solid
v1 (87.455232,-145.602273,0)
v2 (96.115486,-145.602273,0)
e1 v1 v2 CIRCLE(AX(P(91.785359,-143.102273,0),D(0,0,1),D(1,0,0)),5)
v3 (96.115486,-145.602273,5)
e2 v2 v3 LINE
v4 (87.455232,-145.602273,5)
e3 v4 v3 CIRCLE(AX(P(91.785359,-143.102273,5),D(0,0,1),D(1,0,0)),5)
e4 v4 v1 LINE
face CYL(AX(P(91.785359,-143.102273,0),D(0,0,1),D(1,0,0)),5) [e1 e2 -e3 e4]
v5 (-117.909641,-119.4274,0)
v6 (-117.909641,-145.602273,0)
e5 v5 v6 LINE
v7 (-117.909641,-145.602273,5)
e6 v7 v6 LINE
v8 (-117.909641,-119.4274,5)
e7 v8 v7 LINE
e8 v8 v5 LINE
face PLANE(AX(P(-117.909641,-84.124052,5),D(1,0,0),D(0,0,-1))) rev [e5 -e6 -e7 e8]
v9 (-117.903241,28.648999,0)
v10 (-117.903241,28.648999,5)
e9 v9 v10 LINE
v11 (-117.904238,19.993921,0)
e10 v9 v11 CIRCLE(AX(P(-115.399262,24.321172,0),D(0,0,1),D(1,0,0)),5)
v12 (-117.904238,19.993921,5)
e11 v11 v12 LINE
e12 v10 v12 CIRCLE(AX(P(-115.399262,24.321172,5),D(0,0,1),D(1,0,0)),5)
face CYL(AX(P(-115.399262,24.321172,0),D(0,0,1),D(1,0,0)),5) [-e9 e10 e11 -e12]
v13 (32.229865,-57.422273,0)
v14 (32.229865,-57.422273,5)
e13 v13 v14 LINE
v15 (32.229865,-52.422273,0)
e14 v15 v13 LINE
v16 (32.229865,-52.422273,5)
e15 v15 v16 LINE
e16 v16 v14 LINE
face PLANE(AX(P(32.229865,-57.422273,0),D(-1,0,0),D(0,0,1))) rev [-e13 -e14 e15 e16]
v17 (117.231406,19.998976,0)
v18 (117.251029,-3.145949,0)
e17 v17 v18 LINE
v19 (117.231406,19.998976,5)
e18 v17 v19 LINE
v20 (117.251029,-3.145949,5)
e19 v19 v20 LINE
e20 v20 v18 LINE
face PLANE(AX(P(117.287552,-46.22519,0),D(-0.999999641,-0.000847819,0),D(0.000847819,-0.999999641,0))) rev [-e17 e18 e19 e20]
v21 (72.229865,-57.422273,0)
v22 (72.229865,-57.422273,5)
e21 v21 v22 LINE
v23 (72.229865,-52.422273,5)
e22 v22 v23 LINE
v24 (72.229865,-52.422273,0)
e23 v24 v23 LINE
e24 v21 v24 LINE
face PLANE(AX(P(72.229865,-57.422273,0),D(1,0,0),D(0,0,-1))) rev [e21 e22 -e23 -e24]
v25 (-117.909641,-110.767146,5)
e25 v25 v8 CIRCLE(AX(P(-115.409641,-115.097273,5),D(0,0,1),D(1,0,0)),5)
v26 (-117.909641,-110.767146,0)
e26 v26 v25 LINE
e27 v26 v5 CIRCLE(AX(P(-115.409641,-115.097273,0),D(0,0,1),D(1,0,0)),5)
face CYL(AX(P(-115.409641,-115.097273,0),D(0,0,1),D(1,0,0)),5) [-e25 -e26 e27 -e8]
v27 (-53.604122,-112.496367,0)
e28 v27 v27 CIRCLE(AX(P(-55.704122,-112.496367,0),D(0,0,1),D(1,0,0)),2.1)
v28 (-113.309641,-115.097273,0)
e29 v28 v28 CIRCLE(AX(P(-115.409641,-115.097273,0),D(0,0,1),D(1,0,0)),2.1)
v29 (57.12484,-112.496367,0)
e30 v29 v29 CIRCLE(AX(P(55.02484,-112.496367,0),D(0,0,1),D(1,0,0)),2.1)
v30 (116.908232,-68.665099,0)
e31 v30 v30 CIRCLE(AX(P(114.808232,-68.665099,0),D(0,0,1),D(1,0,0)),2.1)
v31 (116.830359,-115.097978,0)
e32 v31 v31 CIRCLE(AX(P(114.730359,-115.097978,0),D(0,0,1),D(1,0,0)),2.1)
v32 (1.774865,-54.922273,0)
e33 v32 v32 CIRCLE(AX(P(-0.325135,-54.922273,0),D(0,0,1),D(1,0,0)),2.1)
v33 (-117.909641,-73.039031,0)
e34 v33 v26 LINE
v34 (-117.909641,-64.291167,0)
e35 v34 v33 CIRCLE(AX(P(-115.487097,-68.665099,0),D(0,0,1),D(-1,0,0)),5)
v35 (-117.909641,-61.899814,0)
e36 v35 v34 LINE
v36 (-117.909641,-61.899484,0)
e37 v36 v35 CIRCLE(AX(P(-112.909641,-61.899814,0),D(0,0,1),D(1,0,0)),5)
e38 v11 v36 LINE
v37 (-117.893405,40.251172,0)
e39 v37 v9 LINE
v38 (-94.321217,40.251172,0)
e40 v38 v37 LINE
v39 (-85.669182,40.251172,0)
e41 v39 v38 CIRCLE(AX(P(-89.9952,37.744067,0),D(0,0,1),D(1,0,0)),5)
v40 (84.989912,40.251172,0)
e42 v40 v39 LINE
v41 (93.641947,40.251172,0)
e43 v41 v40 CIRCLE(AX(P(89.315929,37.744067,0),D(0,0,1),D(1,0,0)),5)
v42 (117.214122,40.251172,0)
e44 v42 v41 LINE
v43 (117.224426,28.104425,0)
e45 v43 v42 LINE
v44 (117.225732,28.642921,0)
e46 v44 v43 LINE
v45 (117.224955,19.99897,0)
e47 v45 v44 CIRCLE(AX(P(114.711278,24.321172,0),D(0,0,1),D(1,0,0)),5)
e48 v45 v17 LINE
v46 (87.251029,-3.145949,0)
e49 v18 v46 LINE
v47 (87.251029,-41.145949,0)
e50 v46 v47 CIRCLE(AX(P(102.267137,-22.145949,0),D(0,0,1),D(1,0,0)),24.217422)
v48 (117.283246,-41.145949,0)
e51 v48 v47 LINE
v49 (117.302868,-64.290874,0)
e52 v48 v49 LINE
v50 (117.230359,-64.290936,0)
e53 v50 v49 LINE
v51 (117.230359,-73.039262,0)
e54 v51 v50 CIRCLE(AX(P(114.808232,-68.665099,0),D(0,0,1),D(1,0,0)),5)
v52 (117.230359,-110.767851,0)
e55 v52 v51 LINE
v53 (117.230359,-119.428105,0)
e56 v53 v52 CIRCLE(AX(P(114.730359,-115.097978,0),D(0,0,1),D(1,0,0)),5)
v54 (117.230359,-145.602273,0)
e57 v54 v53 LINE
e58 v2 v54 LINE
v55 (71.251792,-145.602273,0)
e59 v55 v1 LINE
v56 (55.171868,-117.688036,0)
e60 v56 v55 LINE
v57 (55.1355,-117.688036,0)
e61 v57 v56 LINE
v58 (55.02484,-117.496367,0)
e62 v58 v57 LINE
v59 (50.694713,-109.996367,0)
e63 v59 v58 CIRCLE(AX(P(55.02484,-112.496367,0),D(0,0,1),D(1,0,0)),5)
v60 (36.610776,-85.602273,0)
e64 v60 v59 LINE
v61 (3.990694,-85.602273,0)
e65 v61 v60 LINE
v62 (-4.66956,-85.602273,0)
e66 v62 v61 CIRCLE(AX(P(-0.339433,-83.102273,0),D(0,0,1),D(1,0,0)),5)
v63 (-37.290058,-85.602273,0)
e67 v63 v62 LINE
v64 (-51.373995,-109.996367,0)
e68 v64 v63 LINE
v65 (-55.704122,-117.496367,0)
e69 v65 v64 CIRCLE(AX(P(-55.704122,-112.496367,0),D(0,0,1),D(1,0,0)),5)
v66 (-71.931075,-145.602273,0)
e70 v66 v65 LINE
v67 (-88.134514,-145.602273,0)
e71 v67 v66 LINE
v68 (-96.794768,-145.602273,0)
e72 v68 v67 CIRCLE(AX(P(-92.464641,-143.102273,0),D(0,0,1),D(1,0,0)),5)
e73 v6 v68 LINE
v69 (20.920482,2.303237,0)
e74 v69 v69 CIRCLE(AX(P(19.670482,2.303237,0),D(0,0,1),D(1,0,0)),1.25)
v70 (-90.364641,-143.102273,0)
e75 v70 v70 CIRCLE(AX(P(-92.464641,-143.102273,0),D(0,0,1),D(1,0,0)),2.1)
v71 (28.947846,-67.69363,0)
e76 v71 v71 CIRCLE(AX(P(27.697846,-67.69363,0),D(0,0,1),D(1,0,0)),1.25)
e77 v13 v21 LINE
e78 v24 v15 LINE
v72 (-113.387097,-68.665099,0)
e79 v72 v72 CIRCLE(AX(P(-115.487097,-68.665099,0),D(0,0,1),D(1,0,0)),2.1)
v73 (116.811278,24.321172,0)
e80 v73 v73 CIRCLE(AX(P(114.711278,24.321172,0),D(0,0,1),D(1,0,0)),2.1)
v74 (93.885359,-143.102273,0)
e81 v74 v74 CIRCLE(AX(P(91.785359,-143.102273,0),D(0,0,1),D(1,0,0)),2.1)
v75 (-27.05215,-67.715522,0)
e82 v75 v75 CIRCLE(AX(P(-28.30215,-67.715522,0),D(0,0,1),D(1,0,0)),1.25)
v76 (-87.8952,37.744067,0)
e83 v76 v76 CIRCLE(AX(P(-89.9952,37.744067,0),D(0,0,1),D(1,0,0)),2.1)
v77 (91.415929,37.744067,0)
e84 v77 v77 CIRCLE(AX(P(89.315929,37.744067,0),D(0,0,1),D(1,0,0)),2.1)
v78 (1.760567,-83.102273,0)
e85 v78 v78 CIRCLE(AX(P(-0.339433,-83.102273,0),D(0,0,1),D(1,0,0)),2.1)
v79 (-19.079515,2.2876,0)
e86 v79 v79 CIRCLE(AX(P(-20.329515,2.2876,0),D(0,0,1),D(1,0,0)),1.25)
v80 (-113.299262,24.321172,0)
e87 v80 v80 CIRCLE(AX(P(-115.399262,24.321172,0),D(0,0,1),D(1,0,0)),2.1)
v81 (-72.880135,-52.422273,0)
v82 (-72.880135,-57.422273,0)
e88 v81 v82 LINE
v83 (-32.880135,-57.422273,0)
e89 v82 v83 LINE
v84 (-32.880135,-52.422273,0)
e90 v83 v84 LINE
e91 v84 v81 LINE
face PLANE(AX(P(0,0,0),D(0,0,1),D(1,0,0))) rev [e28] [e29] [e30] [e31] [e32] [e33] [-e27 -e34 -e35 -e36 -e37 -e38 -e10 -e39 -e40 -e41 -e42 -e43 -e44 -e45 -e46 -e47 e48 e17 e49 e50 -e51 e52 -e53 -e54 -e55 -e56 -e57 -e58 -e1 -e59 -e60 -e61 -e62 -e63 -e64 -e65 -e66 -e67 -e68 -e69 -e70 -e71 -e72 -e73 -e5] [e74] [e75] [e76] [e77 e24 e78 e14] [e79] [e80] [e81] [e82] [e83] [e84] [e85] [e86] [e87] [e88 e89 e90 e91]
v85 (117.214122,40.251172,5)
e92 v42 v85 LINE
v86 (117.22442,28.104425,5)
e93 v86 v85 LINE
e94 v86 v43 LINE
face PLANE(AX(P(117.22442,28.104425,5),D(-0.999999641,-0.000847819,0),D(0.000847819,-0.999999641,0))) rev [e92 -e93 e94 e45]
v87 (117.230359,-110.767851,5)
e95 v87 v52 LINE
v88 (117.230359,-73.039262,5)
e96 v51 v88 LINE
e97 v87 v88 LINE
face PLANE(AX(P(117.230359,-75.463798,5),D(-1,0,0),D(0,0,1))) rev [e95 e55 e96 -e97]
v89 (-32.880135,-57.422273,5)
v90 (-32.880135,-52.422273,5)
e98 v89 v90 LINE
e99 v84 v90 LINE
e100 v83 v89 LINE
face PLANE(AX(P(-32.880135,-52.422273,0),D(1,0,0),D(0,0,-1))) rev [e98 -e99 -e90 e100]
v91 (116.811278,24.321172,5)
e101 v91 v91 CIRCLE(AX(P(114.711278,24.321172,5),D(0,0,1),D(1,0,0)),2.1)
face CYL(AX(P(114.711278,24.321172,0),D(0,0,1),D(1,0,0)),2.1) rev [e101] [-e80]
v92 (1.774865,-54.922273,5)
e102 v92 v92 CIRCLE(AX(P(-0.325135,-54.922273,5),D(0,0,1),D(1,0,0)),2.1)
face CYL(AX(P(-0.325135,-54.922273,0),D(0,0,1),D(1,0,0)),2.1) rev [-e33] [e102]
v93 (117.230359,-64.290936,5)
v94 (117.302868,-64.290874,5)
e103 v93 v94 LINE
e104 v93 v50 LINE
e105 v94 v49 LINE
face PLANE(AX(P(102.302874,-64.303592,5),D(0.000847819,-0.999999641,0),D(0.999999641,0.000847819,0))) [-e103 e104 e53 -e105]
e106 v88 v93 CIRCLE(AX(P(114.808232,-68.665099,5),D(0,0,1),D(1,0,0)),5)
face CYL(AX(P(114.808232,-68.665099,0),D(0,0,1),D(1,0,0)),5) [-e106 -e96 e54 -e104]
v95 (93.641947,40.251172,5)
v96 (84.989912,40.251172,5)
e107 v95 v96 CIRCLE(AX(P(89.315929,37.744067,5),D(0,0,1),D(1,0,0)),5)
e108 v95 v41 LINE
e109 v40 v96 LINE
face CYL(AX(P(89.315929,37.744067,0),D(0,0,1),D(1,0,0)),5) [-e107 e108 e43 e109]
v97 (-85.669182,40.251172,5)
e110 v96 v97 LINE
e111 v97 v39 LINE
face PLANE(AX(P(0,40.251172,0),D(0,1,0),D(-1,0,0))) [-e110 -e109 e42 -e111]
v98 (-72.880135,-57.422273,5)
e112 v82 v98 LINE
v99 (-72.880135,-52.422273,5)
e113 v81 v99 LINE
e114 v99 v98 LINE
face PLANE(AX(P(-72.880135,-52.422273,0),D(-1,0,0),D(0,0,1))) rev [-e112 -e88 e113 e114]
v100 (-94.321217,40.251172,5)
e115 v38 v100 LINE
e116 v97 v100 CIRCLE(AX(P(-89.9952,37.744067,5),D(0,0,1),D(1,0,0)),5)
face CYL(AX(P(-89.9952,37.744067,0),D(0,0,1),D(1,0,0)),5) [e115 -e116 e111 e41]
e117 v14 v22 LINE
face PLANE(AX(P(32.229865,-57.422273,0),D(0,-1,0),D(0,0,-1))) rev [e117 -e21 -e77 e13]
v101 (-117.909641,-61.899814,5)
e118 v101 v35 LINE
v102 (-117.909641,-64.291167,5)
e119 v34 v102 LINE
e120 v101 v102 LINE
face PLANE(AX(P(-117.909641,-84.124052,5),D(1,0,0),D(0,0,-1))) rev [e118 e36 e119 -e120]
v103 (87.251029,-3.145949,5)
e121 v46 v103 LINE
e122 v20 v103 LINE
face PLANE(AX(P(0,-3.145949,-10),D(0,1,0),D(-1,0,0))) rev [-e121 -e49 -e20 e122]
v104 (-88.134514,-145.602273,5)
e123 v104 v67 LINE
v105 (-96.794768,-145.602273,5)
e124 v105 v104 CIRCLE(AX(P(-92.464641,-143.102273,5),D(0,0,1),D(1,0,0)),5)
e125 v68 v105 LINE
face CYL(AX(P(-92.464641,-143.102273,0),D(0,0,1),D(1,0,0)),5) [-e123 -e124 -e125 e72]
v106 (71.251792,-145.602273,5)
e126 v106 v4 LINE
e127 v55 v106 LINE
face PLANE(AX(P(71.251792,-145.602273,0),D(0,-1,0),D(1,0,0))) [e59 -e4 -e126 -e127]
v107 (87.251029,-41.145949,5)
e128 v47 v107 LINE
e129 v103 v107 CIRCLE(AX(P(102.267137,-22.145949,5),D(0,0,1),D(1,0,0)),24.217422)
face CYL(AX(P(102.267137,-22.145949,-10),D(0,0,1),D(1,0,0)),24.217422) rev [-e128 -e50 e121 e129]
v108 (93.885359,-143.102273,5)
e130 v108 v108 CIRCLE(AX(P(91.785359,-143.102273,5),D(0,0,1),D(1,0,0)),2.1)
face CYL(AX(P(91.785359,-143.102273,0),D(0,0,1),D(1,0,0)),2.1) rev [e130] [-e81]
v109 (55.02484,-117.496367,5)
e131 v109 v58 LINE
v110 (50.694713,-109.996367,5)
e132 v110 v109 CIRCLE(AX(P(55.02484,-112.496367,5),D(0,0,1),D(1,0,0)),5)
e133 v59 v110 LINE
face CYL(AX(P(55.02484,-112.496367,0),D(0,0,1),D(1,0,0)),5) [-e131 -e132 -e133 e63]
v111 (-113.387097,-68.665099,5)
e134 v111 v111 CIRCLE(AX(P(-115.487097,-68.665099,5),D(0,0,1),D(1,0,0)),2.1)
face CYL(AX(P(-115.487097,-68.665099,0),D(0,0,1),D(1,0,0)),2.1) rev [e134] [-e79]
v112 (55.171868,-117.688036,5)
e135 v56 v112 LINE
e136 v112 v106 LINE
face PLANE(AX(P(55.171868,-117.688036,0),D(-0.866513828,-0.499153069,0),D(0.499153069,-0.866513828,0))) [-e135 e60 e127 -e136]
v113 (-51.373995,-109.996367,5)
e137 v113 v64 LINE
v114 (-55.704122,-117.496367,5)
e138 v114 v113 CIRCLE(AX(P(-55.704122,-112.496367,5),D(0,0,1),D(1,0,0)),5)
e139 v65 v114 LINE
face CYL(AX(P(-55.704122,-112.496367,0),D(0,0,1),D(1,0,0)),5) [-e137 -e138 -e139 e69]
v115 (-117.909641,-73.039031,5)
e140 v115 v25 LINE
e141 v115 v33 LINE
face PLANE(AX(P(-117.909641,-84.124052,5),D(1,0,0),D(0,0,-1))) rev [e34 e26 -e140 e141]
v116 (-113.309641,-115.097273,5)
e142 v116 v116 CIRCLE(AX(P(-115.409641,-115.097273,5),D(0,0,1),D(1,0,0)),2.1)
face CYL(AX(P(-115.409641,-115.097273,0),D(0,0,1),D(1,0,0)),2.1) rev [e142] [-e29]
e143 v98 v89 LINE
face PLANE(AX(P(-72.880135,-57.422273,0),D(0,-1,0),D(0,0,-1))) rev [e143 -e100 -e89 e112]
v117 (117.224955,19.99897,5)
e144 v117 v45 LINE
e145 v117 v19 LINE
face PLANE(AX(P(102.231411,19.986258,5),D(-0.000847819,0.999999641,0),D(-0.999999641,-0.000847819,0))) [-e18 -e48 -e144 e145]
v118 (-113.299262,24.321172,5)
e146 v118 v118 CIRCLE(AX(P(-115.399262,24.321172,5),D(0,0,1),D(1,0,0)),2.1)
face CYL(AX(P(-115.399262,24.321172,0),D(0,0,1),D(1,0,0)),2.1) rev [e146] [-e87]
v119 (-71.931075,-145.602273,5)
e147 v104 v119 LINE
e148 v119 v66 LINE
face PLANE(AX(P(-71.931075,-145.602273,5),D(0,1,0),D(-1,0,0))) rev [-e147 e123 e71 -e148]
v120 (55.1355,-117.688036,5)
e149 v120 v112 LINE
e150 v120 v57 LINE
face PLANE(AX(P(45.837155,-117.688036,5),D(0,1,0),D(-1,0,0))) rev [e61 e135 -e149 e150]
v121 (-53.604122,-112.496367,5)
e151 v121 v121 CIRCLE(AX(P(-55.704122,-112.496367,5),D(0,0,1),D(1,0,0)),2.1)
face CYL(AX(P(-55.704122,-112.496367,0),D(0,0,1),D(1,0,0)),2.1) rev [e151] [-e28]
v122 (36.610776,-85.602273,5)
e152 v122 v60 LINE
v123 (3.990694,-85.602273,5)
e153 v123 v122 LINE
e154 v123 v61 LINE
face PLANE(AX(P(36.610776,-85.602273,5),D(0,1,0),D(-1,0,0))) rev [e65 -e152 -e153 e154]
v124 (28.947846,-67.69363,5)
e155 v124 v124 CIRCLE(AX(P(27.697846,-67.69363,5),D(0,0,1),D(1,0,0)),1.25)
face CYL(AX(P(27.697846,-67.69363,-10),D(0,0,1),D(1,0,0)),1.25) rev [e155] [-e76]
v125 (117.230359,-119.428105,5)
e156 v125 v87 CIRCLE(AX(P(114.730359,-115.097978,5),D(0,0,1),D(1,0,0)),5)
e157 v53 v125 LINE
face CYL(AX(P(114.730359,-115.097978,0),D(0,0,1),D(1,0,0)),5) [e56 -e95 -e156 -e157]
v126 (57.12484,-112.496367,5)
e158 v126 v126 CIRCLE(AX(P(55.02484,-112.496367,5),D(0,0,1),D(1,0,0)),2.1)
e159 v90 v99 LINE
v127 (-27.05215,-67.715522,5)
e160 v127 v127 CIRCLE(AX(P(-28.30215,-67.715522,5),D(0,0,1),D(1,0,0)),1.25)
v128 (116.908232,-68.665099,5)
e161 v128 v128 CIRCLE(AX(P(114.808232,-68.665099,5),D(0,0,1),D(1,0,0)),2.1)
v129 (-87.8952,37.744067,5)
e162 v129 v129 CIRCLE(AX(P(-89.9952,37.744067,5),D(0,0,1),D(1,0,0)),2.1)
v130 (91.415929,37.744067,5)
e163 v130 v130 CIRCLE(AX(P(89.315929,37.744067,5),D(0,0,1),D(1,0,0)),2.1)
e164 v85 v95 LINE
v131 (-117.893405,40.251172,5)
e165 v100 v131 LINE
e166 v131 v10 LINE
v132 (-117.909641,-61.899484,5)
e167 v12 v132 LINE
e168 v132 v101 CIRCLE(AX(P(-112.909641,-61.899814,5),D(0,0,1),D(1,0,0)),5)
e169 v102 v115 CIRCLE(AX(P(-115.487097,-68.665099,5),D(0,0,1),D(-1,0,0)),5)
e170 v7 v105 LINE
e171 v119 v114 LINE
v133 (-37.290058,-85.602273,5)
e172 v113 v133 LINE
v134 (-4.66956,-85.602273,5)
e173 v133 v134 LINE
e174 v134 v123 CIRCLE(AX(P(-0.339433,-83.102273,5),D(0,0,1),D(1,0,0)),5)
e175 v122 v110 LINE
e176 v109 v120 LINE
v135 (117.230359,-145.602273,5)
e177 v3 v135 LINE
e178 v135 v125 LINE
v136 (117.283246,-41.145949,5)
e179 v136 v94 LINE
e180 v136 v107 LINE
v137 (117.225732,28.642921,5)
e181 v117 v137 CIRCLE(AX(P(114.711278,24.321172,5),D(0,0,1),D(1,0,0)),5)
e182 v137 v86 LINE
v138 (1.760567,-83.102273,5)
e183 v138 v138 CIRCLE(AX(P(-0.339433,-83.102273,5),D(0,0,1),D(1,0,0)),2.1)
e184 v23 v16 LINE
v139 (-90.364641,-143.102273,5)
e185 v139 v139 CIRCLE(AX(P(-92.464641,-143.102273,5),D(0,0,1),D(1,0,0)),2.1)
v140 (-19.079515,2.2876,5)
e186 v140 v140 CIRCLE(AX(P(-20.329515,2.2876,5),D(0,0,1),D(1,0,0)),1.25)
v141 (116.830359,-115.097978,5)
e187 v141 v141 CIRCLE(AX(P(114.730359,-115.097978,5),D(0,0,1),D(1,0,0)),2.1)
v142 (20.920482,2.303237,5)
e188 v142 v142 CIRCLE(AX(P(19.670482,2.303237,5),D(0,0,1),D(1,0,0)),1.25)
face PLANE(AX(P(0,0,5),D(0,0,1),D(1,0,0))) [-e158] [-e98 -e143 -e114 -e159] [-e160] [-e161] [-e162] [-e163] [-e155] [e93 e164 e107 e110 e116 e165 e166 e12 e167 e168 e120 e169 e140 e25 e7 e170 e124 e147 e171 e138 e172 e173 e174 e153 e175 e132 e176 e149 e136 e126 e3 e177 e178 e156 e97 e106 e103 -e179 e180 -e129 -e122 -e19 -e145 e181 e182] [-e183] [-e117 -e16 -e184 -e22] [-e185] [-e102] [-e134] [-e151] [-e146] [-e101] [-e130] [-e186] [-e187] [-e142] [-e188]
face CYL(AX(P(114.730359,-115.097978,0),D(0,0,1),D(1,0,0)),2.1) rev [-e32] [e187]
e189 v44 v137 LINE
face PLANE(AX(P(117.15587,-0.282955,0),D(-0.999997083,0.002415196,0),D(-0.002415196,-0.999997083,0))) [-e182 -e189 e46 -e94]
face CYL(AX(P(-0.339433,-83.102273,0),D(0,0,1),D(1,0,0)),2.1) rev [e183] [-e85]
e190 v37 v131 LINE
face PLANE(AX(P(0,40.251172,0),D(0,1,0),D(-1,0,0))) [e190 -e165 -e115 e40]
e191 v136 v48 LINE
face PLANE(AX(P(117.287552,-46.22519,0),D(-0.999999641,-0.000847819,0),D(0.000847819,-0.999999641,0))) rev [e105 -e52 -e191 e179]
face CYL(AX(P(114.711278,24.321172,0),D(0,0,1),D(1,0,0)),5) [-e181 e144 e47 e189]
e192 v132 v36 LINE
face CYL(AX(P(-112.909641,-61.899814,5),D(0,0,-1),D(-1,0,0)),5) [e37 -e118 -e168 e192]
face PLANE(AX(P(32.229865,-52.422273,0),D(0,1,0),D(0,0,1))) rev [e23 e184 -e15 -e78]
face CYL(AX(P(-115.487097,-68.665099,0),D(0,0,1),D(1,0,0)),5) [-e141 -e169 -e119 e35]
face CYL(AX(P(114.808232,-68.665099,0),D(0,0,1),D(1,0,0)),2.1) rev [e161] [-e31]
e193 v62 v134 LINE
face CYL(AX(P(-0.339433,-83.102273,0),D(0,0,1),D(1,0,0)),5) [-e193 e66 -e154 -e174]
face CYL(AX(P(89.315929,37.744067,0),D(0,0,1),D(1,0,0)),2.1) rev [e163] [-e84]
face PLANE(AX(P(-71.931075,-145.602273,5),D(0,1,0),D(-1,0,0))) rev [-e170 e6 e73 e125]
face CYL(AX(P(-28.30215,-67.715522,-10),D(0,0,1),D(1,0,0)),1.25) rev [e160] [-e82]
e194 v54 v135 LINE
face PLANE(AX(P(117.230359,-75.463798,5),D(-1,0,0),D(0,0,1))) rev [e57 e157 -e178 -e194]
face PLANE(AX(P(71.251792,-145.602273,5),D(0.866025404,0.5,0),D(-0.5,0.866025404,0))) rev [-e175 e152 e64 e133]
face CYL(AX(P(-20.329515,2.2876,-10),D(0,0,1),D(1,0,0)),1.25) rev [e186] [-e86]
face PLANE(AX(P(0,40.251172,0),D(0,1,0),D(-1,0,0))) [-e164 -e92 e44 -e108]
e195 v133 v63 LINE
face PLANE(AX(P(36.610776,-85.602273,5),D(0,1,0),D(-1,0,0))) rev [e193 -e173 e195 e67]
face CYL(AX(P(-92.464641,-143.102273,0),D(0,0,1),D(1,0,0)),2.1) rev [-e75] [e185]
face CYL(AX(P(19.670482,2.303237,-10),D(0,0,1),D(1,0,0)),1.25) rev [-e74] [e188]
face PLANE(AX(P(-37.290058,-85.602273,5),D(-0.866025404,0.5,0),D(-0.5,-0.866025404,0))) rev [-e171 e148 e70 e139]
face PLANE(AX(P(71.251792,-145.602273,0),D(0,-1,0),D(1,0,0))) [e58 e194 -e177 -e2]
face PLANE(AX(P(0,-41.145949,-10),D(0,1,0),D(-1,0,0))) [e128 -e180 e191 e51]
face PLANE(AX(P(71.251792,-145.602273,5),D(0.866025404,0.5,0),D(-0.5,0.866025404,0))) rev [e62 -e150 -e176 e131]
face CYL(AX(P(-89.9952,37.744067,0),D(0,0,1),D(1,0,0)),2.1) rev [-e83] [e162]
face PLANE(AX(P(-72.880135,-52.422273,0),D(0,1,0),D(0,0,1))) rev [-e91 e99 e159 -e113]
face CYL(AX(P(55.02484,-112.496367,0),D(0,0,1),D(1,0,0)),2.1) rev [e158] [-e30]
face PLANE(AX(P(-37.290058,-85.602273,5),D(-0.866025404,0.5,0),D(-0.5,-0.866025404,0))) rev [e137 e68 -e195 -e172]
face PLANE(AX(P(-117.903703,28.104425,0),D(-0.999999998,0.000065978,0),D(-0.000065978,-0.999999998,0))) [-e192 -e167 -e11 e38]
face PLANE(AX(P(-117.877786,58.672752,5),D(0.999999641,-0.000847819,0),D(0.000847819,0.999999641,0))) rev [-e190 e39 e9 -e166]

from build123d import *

# Parameters (mm, degrees)
BOSS_EXTRUDE2_DEPTH  = 5
CUT_EXTRUDE1_START   = -5
CUT_EXTRUDE1_DEPTH   = 5
BOSS_EXTRUDE4_DEPTH  = 5
BOSS_EXTRUDE6_DEPTH  = 5
SKETCH7_R            = 2.1
CUT_EXTRUDE3_DEPTH   = 5
CUT_EXTRUDE7_START   = -5
CUT_EXTRUDE7_DEPTH   = 5
BOSS_EXTRUDE9_START  = -5
BOSS_EXTRUDE9_DEPTH  = 5
CUT_EXTRUDE10_DEPTH  = 5
SKETCH18_R           = 2.1
BOSS_EXTRUDE12_DEPTH = 5
BOSS_EXTRUDE13_DEPTH = 5
SKETCH21_W           = 5
SKETCH21_H           = 8.660255075
BOSS_EXTRUDE15_DEPTH = 0.3
CUT_EXTRUDE12_DEPTH  = 5
BOSS_EXTRUDE16_DEPTH = 5
BOSS_EXTRUDE17_DEPTH = 5
CUT_EXTRUDE13_DEPTH  = 5
SKETCH26_R           = 2.1
CUT_EXTRUDE14_DEPTH  = 5
CUT_EXTRUDE15_DEPTH  = 5
SKETCH28_R           = 2.1
BOSS_EXTRUDE18_DEPTH = 5
BOSS_EXTRUDE22_START = -5
BOSS_EXTRUDE22_DEPTH = 5
SKETCH31_R           = 2.1
CUT_EXTRUDE16_DEPTH  = 5
CUT_EXTRUDE17_DEPTH  = 5
SKETCH33_R           = 5
BOSS_EXTRUDE23_DEPTH = 5
SKETCH34_R           = 2.1
CUT_EXTRUDE18_DEPTH  = 5
SKETCH35_R           = 2.1
SKETCH35_W           = 40
SKETCH35_H           = 5
CUT_EXTRUDE19_DEPTH  = 5
SKETCH36_W           = 5
SKETCH36_H           = 84.289880446
BOSS_EXTRUDE24_DEPTH = 15
SKETCH38_R           = 1.25
CUT_EXTRUDE20_DEPTH  = 15
CUT_EXTRUDE22_DEPTH  = 15
SKETCH41_W           = 235.10328775
SKETCH41_H           = 5
CUT_EXTRUDE23_DEPTH  = 5
SKETCH42_W           = 21.47370592
SKETCH42_H           = 11.045026483
CUT_EXTRUDE24_DEPTH  = 5
BOSS_EXTRUDE25_DEPTH = 5
SKETCH44_R           = 2.1
CUT_EXTRUDE25_DEPTH  = 5


with BuildPart() as part:
    # Sketch1 → Boss-Extrude2 (new body)
    with BuildSketch(Plane.XY):
        with BuildLine():
            Line((-117.909641201, -61.899813743), (-117.909641201, -75.46379791))
            ThreePointArc((-117.909641201, -75.46379791), (-120.409641201, -79.793924929), (-117.909641201, -84.124051948))
            Line((-117.909641201, -84.124051948), (-117.909641201, -97.688036115))
            Line((-117.909641201, -97.688036115), (-104.194704325, -106.486172223))
            ThreePointArc((-104.194704325, -106.486172223), (-101.899920025, -110.928464988), (-96.905389489, -111.162269871))
            Line((-96.905389489, -111.162269871), (-86.732726665, -117.688036115))
            Line((-86.732726665, -117.688036115), (-46.516437834, -117.688036115))
            ThreePointArc((-46.516437834, -117.688036115), (-42.186310815, -120.188036115), (-37.856183796, -117.688036115))
            Line((-37.856183796, -117.688036115), (37.176901394, -117.688036115))
            ThreePointArc((37.176901394, -117.688036115), (41.507028413, -120.188036115), (45.837155432, -117.688036115))
            Line((45.837155432, -117.688036115), (86.053444263, -117.688036115))
            Line((86.053444263, -117.688036115), (96.226107086, -111.162269871))
            ThreePointArc((96.226107086, -111.162269871), (101.220637622, -110.928464988), (103.515421923, -106.486172223))
            Line((103.515421923, -106.486172223), (117.230358799, -97.688036115))
            Line((117.230358799, -97.688036115), (117.230358799, -84.124051948))
            ThreePointArc((117.230358799, -84.124051948), (119.730358799, -79.793924929), (117.230358799, -75.46379791))
            Line((117.230358799, -75.46379791), (117.230358799, -61.899813743))
            ThreePointArc((117.230358799, -61.899813743), (115.765892705, -58.364279837), (112.230358799, -56.899813743))
            Line((112.230358799, -56.899813743), (107.230252822, -56.899813743))
            ThreePointArc((107.230252822, -56.899813743), (103.694756385, -55.435385117), (102.230252824, -51.89991972))
            Line((102.230252824, -51.89991972), (102.22876914, 18.10008028))
            ThreePointArc((102.22876914, 18.10008028), (103.693197764, 21.635682694), (107.228769139, 23.100186257))
            Line((107.228769139, 23.100186257), (112.224422266, 23.100186257))
            ThreePointArc((112.224422266, 23.100186257), (115.761454601, 24.566151415), (117.224420469, 28.104425352))
            Line((117.224420469, 28.104425352), (117.198504049, 58.672752041))
            ThreePointArc((117.198504049, 58.672752041), (119.694832884, 63.004997571), (117.19116172, 67.333004004))
            Line((117.19116172, 67.333004004), (117.165248894, 97.897091598))
            ThreePointArc((117.165248894, 97.897091598), (115.8233862, 102.892284122), (112.165252488, 106.548867445))
            Line((112.165252488, 106.548867445), (88.414612972, 120.261305563))
            ThreePointArc((88.414612972, 120.261305563), (86.002803423, 121.260309788), (83.414612972, 121.601051525))
            Line((83.414612972, 121.601051525), (-84.093895374, 121.601051525))
            ThreePointArc((-84.093895374, 121.601051525), (-86.682085825, 121.260309788), (-89.093895374, 120.261305563))
            Line((-89.093895374, 120.261305563), (-112.84453489, 106.548867445))
            ThreePointArc((-112.84453489, 106.548867445), (-116.502668602, 102.892284122), (-117.844531296, 97.897091598))
            Line((-117.844531296, 97.897091598), (-117.870444122, 67.333004004))
            ThreePointArc((-117.870444122, 67.333004004), (-120.374115287, 63.004997571), (-117.877786452, 58.672752041))
            Line((-117.877786452, 58.672752041), (-117.903702872, 28.104425352))
            ThreePointArc((-117.903702872, 28.104425352), (-116.440737003, 24.566151415), (-112.903704669, 23.100186257))
            Line((-112.903704669, 23.100186257), (-107.908051541, 23.100186257))
            ThreePointArc((-107.908051541, 23.100186257), (-104.372480167, 21.635682694), (-102.908051542, 18.10008028))
            Line((-102.908051542, 18.10008028), (-102.909535226, -51.89991972))
            ThreePointArc((-102.909535226, -51.89991972), (-104.374038788, -55.435385117), (-107.909535225, -56.899813743))
            Line((-107.909535225, -56.899813743), (-112.909641201, -56.899813743))
            ThreePointArc((-112.909641201, -56.899813743), (-116.445175107, -58.364279837), (-117.909641201, -61.899813743))
        make_face()
    extrude(amount=BOSS_EXTRUDE2_DEPTH)

    # Sketch2 → Cut-Extrude1 (cut)
    with BuildSketch(Plane.XY.offset(5).offset(CUT_EXTRUDE1_START)):
        with BuildLine():
            Line((82.551631294, 83.23178077), (112.19953348, 66.114556461))
            ThreePointArc((112.19953348, 66.114556461), (115.857667192, 62.457973139), (117.199529886, 57.462780614))
            Line((117.199529886, 57.462780614), (117.198504049, 58.672752041))
            ThreePointArc((117.198504049, 58.672752041), (119.694832884, 63.004997571), (117.19116172, 67.333004004))
            Line((117.19116172, 67.333004004), (117.165248894, 97.897091598))
            ThreePointArc((117.165248894, 97.897091598), (115.8233862, 102.892284122), (112.165252488, 106.548867445))
            Line((112.165252488, 106.548867445), (88.414612972, 120.261305563))
            ThreePointArc((88.414612972, 120.261305563), (86.002803423, 121.260309788), (83.414612972, 121.601051525))
            Line((83.414612972, 121.601051525), (-84.093895374, 121.601051525))
            ThreePointArc((-84.093895374, 121.601051525), (-86.682085825, 121.260309788), (-89.093895374, 120.261305563))
            Line((-89.093895374, 120.261305563), (-112.84453489, 106.548867445))
            ThreePointArc((-112.84453489, 106.548867445), (-116.502668602, 102.892284122), (-117.844531296, 97.897091598))
            Line((-117.844531296, 97.897091598), (-117.870444122, 67.333004004))
            ThreePointArc((-117.870444122, 67.333004004), (-120.374115287, 63.004997571), (-117.877786452, 58.672752041))
            Line((-117.877786452, 58.672752041), (-117.878812289, 57.462780614))
            ThreePointArc((-117.878812289, 57.462780614), (-116.536949595, 62.457973139), (-112.878815883, 66.114556461))
            Line((-112.878815883, 66.114556461), (-83.230913696, 83.23178077))
            ThreePointArc((-83.230913696, 83.23178077), (-80.819104147, 84.230784995), (-78.230913696, 84.571526732))
            Line((-78.230913696, 84.571526732), (77.551631294, 84.571526732))
            ThreePointArc((77.551631294, 84.571526732), (80.139821745, 84.230784995), (82.551631294, 83.23178077))
        make_face()
    extrude(amount=CUT_EXTRUDE1_DEPTH, mode=Mode.SUBTRACT)

    # Sketch5 → Boss-Extrude4 (add)
    with BuildSketch(Plane.XY.offset(5)):
        Polygon((117.224420469, 28.104425352), (117.230358799, -61.899813743), (97.020135534, -61.899813743), (97.020135534, 28.104425352), align=None)
        Polygon((-117.903702872, 28.104425352), (-117.909641201, -61.899813743), (-99.161276446, -61.899813743), (-99.161276446, 28.104425352), align=None)
    extrude(amount=-BOSS_EXTRUDE4_DEPTH)


with BuildPart() as boss_extrude6_tool:
    # Sketch6 → Boss-Extrude6 (new body)
    with BuildSketch(Plane.XY.offset(5)):
        with BuildLine():
            Line((117.229676096, -51.549775852), (117.229104854, -42.889521827))
            ThreePointArc((117.229104854, -42.889521827), (119.729390475, -47.219483936), (117.229676096, -51.549775852))
        make_face()
        with BuildLine():
            Line((-117.908958499, -51.549775852), (-117.908387257, -42.889521827))
            ThreePointArc((-117.908387257, -42.889521827), (-120.408672878, -47.219483936), (-117.908958499, -51.549775852))
        make_face()
    extrude(amount=-BOSS_EXTRUDE6_DEPTH)


with BuildPart() as part_1:
    add(part.part)


with BuildPart() as part_2:
    # Boss-Extrude6: joined with boss_extrude6_tool
    add(part_1.part.fuse(boss_extrude6_tool.part, tol=0.00001))

    # Sketch7 → Cut-Extrude3 (cut)
    with BuildSketch(Plane.XY.offset(5)):
        with Locations((-115.408672889, -47.219813743)):
            Circle(SKETCH7_R)
        with Locations((114.729390486, -47.219813743)):
            Circle(SKETCH7_R)
    extrude(amount=-CUT_EXTRUDE3_DEPTH, mode=Mode.SUBTRACT)

    # Sketch12 → Cut-Extrude7 (cut)
    with BuildSketch(Plane.XY.offset(5).offset(CUT_EXTRUDE7_START)):
        with BuildLine():
            Line((-80.430890219, 57.295225551), (-117.878981263, 57.263476303))
            Line((-117.878981263, 57.263476303), (-117.878812289, 57.462780614))
            ThreePointArc((-117.878812289, 57.462780614), (-116.536949595, 62.457973139), (-112.878815883, 66.114556461))
            Line((-112.878815883, 66.114556461), (-83.230913696, 83.23178077))
            ThreePointArc((-83.230913696, 83.23178077), (-80.819104147, 84.230784995), (-78.230913696, 84.571526732))
            Line((-78.230913696, 84.571526732), (77.551631294, 84.571526732))
            ThreePointArc((77.551631294, 84.571526732), (80.139821745, 84.230784995), (82.551631294, 83.23178077))
            Line((82.551631294, 83.23178077), (112.19953348, 66.114556461))
            ThreePointArc((112.19953348, 66.114556461), (115.857667192, 62.457973139), (117.199529886, 57.462780614))
            Line((117.199529886, 57.462780614), (77.975136294, 57.429525381))
            Line((77.975136294, 57.429525381), (-80.430890219, 57.295225551))
        make_face()
    extrude(amount=CUT_EXTRUDE7_DEPTH, mode=Mode.SUBTRACT)

    # Boss-Extrude9: read off the stored shape, not the designer's step
    # Boss-Extrude9 outline → Boss-Extrude9 (add)
    with BuildSketch(Plane.XY.offset(5).offset(BOSS_EXTRUDE9_START)):
        with BuildLine():
            Line((-117.909641201, -97.688036115), (-117.909641201, -147.554211412))
            Line((-117.909641201, -147.554211412), (-57.839641201, -147.554211412))
            Line((-57.839641201, -147.554211412), (-27.973465904, -117.688036115))
            Line((-27.973465904, -117.688036115), (-37.856183796, -117.688036115))
            ThreePointArc((-37.856183796, -117.688036115), (-42.186310815, -120.188036115), (-46.516437834, -117.688036115))
            Line((-46.516437834, -117.688036115), (-86.732726665, -117.688036115))
            Line((-86.732726665, -117.688036115), (-96.905389489, -111.162269871))
            ThreePointArc((-96.905389489, -111.162269871), (-101.899920025, -110.928464988), (-104.194704325, -106.486172223))
            Line((-104.194704325, -106.486172223), (-117.909641201, -97.688036115))
        make_face()
        with BuildLine():
            Line((-83.230913696, 83.23178077), (-112.878815883, 66.114556461))
            ThreePointArc((-112.878815883, 66.114556461), (-116.536949595, 62.457973139), (-117.878812289, 57.462780614))
            Line((-117.878812289, 57.462780614), (-117.878981263, 57.263476303))
            Line((-117.878981263, 57.263476303), (117.199529886, 57.462780614))
            ThreePointArc((117.199529886, 57.462780614), (115.857667192, 62.457973139), (112.19953348, 66.114556461))
            Line((112.19953348, 66.114556461), (82.551631294, 83.23178077))
            ThreePointArc((82.551631294, 83.23178077), (80.139821745, 84.230784995), (77.551631294, 84.571526732))
            Line((77.551631294, 84.571526732), (-78.230913696, 84.571526732))
            ThreePointArc((-78.230913696, 84.571526732), (-80.819104147, 84.230784995), (-83.230913696, 83.23178077))
        make_face()
    extrude(amount=BOSS_EXTRUDE9_DEPTH)

    # Sketch17 → Cut-Extrude10 (cut)
    with BuildSketch(Plane.XY.offset(5)):
        with BuildLine():
            Line((-117.909641201, -84.124051948), (-117.909641201, -75.46379791))
            ThreePointArc((-117.909641201, -75.46379791), (-120.409641201, -79.793924929), (-117.909641201, -84.124051948))
        make_face()
        with BuildLine():
            Line((-117.908958323, -51.549775852), (-117.908387257, -42.889521827))
            ThreePointArc((-117.908387257, -42.889521827), (-120.408672878, -47.219484012), (-117.908958323, -51.549775852))
        make_face()
        with BuildLine():
            Line((117.229104531, -42.889521827), (117.229676096, -51.549775852))
            ThreePointArc((117.229676096, -51.549775852), (119.729390475, -47.219483796), (117.229104531, -42.889521827))
        make_face()
        with BuildLine():
            Line((117.230358799, -75.46379791), (117.230358799, -84.124051948))
            ThreePointArc((117.230358799, -84.124051948), (119.730358799, -79.793924929), (117.230358799, -75.46379791))
        make_face()
    extrude(amount=-CUT_EXTRUDE10_DEPTH, mode=Mode.SUBTRACT)

    # Sketch18 → Boss-Extrude12 (add)
    with BuildSketch(Plane.XY.offset(5)):
        with Locations((114.729390486, -47.219813743)):
            Circle(SKETCH18_R)
        with Locations((-115.408672889, -47.219813743)):
            Circle(SKETCH18_R)
    extrude(amount=-BOSS_EXTRUDE12_DEPTH)

    # Sketch19 → Boss-Extrude13 (add)
    with BuildSketch(Plane.XY.offset(5)):
        with BuildLine():
            Line((-117.908033697, -37.535691027), (-117.908609204, -46.258353482))
            ThreePointArc((-117.908609204, -46.258353482), (-120.463165041, -41.89685369), (-117.908033697, -37.535691027))
        make_face()
        with BuildLine():
            Line((-117.892209168, 41.795033425), (-117.899551497, 33.134781462))
            ThreePointArc((-117.899551497, 33.134781462), (-120.395880333, 37.467026992), (-117.892209168, 41.795033425))
        make_face()
        with BuildLine():
            ThreePointArc((117.212926765, 41.795033425), (119.71659793, 37.467026992), (117.220269095, 33.134781462))
            Line((117.220269095, 33.134781462), (117.212926765, 41.795033425))
        make_face()
        with BuildLine():
            Line((117.280209688, -37.564938053), (117.287552017, -46.225190016))
            ThreePointArc((117.287552017, -46.225190016), (119.783880852, -41.892944486), (117.280209688, -37.564938053))
        make_face()
        with BuildLine():
            Line((117.230358799, -100.329973207), (117.230358799, -108.990227245))
            ThreePointArc((117.230358799, -108.990227245), (119.730358799, -104.660100226), (117.230358799, -100.329973207))
        make_face()
        with BuildLine():
            Line((-117.909641201, -100.329973207), (-117.909641201, -108.990227245))
            ThreePointArc((-117.909641201, -108.990227245), (-120.409641201, -104.660100226), (-117.909641201, -100.329973207))
        make_face()
    extrude(amount=-BOSS_EXTRUDE13_DEPTH)


with BuildPart() as boss_extrude13_piece_1:
    # of the separate pieces the step leaves, piece 1, a body of its own (boss_extrude13_pieces)
    add(part_2.part.solids().sort_by_distance((-117.878981263, 57.263476303, 0))[0])



with BuildPart() as boss_extrude13_piece_2:
    # of the separate pieces the step leaves, piece 2, a body of its own (boss_extrude13_pieces)
    add(part_2.part.solids().sort_by_distance((117.212926765, 41.795033425, 5))[0])


with BuildPart() as boss_extrude13_piece_3:
    # of the separate pieces the step leaves, piece 3, a body of its own (boss_extrude13_pieces)
    add(part_2.part.solids().sort_by_distance((-117.892209168, 41.795033425, 5))[0])


with BuildPart() as boss_extrude13_piece_4:
    # of the separate pieces the step leaves, piece 4, a body of its own (boss_extrude13_pieces)
    add(part_2.part.solids().sort_by_distance((117.280209688, -37.564938053, 5))[0])


with BuildPart() as boss_extrude13_piece_5:
    # of the separate pieces the step leaves, piece 5, a body of its own (boss_extrude13_pieces)
    add(part_2.part.solids().sort_by_distance((117.230358799, -100.329973207, 5))[0])


with BuildPart() as boss_extrude13_piece_1_1:
    add(boss_extrude13_piece_1.part)

    add(boss_extrude13_piece_4.part)  # Boss-Extrude15 merges Boss-Extrude13 piece 4
    # Sketch21 → Boss-Extrude15 (add)
    with BuildSketch(Plane(origin=(117.248277127, 0.099405362, 0), x_dir=(0, 0, 1), z_dir=(-0.999999640601339, -0.0008478190804545042, 0))):
        with Locations((2.5, -41.99448449)):
            Rectangle(SKETCH21_W, SKETCH21_H)
    extrude(amount=BOSS_EXTRUDE15_DEPTH)

    # Sketch23 → Boss-Extrude16 (add)
    with BuildSketch(Plane.XY.offset(5)):
        with BuildLine():
            Line((117.220155691, 33.134715862), (117.212813251, 41.795098832))
            ThreePointArc((117.212813251, 41.795098832), (119.71659793, 37.467026992), (117.220155691, 33.134715862))
        make_face()
        with BuildLine():
            Line((-117.892095653, 41.795098832), (-117.899438094, 33.134715862))
            ThreePointArc((-117.899438094, 33.134715862), (-120.395880333, 37.467026992), (-117.892095653, 41.795098832))
        make_face()
    extrude(amount=-BOSS_EXTRUDE16_DEPTH)


    add(boss_extrude13_piece_5.part)  # Boss-Extrude17 merges Boss-Extrude13 piece 5
    # Sketch24 → Boss-Extrude17 (add)
    with BuildSketch(Plane.XY.offset(5)):
        with BuildLine():
            Line((103.515421923, -106.486172223), (117.230358799, -97.688036115))
            Line((117.230358799, -97.688036115), (117.230358799, -145.602272977))
            Line((117.230358799, -145.602272977), (71.251792179, -145.602272977))
            Line((71.251792179, -145.602272977), (55.17186758, -117.688036115))
            Line((55.17186758, -117.688036115), (86.053444263, -117.688036115))
            Line((86.053444263, -117.688036115), (96.226107086, -111.162269871))
            ThreePointArc((96.226107086, -111.162269871), (101.220637622, -110.928464988), (103.515421923, -106.486172223))
        make_face()
    extrude(amount=-BOSS_EXTRUDE17_DEPTH)

    # Sketch25 → Cut-Extrude13 (cut)
    with BuildSketch(Plane(origin=(0, 0, 0), x_dir=(-1, 0, 0), z_dir=(0, 0, -1))):
        Polygon((-36.610776027, -85.602272977), (37.290058429, -85.602272977), (71.93107458, -145.602272977), (117.909641201, -145.602272977), (117.909641201, -153.53940599), (-71.251792179, -153.53940599), (-71.251792179, -145.602272977), align=None)
    extrude(amount=-CUT_EXTRUDE13_DEPTH, mode=Mode.SUBTRACT)

    # Sketch26 → Cut-Extrude14 (cut)
    with BuildSketch(Plane.XY.offset(5)):
        with Locations((114.716599727, 37.462787896)):
            Circle(SKETCH26_R)
        with Locations((114.783882649, -41.897183582)):
            Circle(SKETCH26_R)
        with Locations((114.730358799, -104.660100226)):
            Circle(SKETCH26_R)
        with Locations((-115.409641201, -104.660100226)):
            Circle(SKETCH26_R)
        with Locations((-115.463165052, -41.897183582)):
            Circle(SKETCH26_R)
        with Locations((-115.39588213, 37.462787896)):
            Circle(SKETCH26_R)
    extrude(amount=-CUT_EXTRUDE14_DEPTH, mode=Mode.SUBTRACT)

    # Sketch27 → Cut-Extrude15 (cut)
    with BuildSketch(Plane.XY.offset(5)):
        with BuildLine():
            Line((-117.892095653, 41.795098832), (-117.899438094, 33.134715862))
            ThreePointArc((-117.899438094, 33.134715862), (-120.395880333, 37.467026992), (-117.892095653, 41.795098832))
        make_face()
        with BuildLine():
            Line((-117.908033697, -37.535691027), (-117.908609204, -46.258353482))
            ThreePointArc((-117.908609204, -46.258353482), (-120.463165041, -41.89685369), (-117.908033697, -37.535691027))
        make_face()
        with BuildLine():
            Line((-117.909641201, -100.329973207), (-117.909641201, -108.990227245))
            ThreePointArc((-117.909641201, -108.990227245), (-120.409641201, -104.660100226), (-117.909641201, -100.329973207))
        make_face()
        with BuildLine():
            Line((117.230358799, -108.990227245), (117.230358799, -100.329973207))
            ThreePointArc((117.230358799, -100.329973207), (119.730358799, -104.660100226), (117.230358799, -108.990227245))
        make_face()
        with BuildLine():
            Line((117.287552017, -46.225190016), (117.280209688, -37.564938053))
            ThreePointArc((117.280209688, -37.564938053), (119.783880852, -41.892944486), (117.287552017, -46.225190016))
        make_face()
        with BuildLine():
            Line((117.220155691, 33.134715862), (117.212813251, 41.795098832))
            ThreePointArc((117.212813251, 41.795098832), (119.71659793, 37.467026992), (117.220155691, 33.134715862))
        make_face()
    extrude(amount=-CUT_EXTRUDE15_DEPTH, mode=Mode.SUBTRACT)

    # Sketch28 → Boss-Extrude18 (add)
    with BuildSketch(Plane.XY.offset(5)):
        with Locations((114.716599727, 37.462787896)):
            Circle(SKETCH28_R)
        with Locations((114.783882649, -41.897183582)):
            Circle(SKETCH28_R)
        with Locations((114.730358799, -104.660100226)):
            Circle(SKETCH28_R)
        with Locations((-115.409641201, -104.660100226)):
            Circle(SKETCH28_R)
        with Locations((-115.463165052, -41.897183582)):
            Circle(SKETCH28_R)
        with Locations((-115.39588213, 37.462787896)):
            Circle(SKETCH28_R)
    extrude(amount=-BOSS_EXTRUDE18_DEPTH)


with BuildPart() as cut_extrude12_tool:
    # Sketch22 → Cut-Extrude12 (new body)
    with BuildSketch(Plane.XY.offset(5)):
        with BuildLine():
            Line((117.212926765, 41.795033425), (117.220269095, 33.134781462))
            ThreePointArc((117.220269095, 33.134781462), (119.71659793, 37.467026992), (117.212926765, 41.795033425))
        make_face()
        with BuildLine():
            Line((-117.899551497, 33.134781462), (-117.892209168, 41.795033425))
            ThreePointArc((-117.892209168, 41.795033425), (-120.395880333, 37.467026992), (-117.899551497, 33.134781462))
        make_face()
    extrude(amount=-CUT_EXTRUDE12_DEPTH)


with BuildPart() as boss_extrude13_piece_2_1:
    add(boss_extrude13_piece_2.part)

    # Cut-Extrude12: cut by cut_extrude12_tool
    add(cut_extrude12_tool.part, mode=Mode.SUBTRACT)


with BuildPart() as boss_extrude13_piece_3_1:
    add(boss_extrude13_piece_3.part)

    # Cut-Extrude12: cut by cut_extrude12_tool
    add(cut_extrude12_tool.part, mode=Mode.SUBTRACT)


with BuildPart() as boss_extrude22_tool:
    # Boss-Extrude22: read off the stored shape, not the designer's step
    # Boss-Extrude22 outline → Boss-Extrude22 (new body)
    with BuildSketch(Plane.XY.offset(5).offset(BOSS_EXTRUDE22_START)):
        with BuildLine():
            ThreePointArc((117.224955254, 19.998970189), (119.711277501, 24.320722052), (117.225732273, 28.642920844))
            Line((117.225732273, 28.642920844), (117.224420469, 28.104425352))
            ThreePointArc((117.224420469, 28.104425352), (117.224421744, 28.102470751), (117.224422255, 28.100516149))
            Line((117.224422255, 28.100516149), (117.224955254, 19.998970189))
        make_face()
        with BuildLine():
            Line((117.230358799, -110.767851006), (117.230358799, -119.428105044))
            ThreePointArc((117.230358799, -119.428105044), (119.730358799, -115.097978025), (117.230358799, -110.767851006))
        make_face()
        with BuildLine():
            ThreePointArc((87.45523178, -145.602272977), (91.785358799, -148.102272977), (96.115485818, -145.602272977))
            Line((96.115485818, -145.602272977), (87.45523178, -145.602272977))
        make_face()
        with BuildLine():
            Line((55.024839537, -117.496366549), (50.694712518, -109.996366549))
            ThreePointArc((50.694712518, -109.996366549), (50.694712517, -114.996366549), (55.024839537, -117.496366549))
        make_face()
        with BuildLine():
            ThreePointArc((-117.909641201, -110.767145958), (-120.409641201, -115.097272977), (-117.909641201, -119.427399996))
            Line((-117.909641201, -119.427399996), (-117.909641201, -110.767145958))
        make_face()
        with BuildLine():
            ThreePointArc((-96.79476822, -145.602272977), (-92.464641201, -148.102272977), (-88.134514182, -145.602272977))
            Line((-88.134514182, -145.602272977), (-96.79476822, -145.602272977))
        make_face()
        with BuildLine():
            ThreePointArc((-55.704121939, -117.496366549), (-51.37399492, -114.996366549), (-51.37399492, -109.996366549))
            Line((-51.37399492, -109.996366549), (-55.704121939, -117.496366549))
        make_face()
        with BuildLine():
            ThreePointArc((-4.669559606, -85.602272977), (-0.339432587, -88.102272977), (3.990694432, -85.602272977))
            Line((3.990694432, -85.602272977), (-4.669559606, -85.602272977))
        make_face()
        with BuildLine():
            Line((-117.903702872, 28.104425352), (-117.903241172, 28.648998661))
            ThreePointArc((-117.903241172, 28.648998661), (-120.399261875, 24.321747367), (-117.904237989, 19.993921248))
            Line((-117.904237989, 19.993921248), (-117.903704658, 28.100516149))
            ThreePointArc((-117.903704658, 28.100516149), (-117.903704147, 28.102470751), (-117.903702872, 28.104425352))
        make_face()
    extrude(amount=BOSS_EXTRUDE22_DEPTH)


with BuildPart() as boss_extrude13_piece_1_2:
    add(boss_extrude13_piece_1_1.part)


with BuildPart() as boss_extrude13_piece_1_3:
    # Boss-Extrude22: joined with boss_extrude22_tool
    add(boss_extrude13_piece_1_2.part.fuse(boss_extrude22_tool.part, tol=0.00001))

    # Sketch31 → Cut-Extrude16 (cut)
    with BuildSketch(Plane.XY.offset(5)):
        with Locations((-115.399261908, 24.32117151)):
            Circle(SKETCH31_R)
        with Locations((-92.464641201, -143.102272977)):
            Circle(SKETCH31_R)
        with Locations((-55.704121939, -112.496366549)):
            Circle(SKETCH31_R)
        with Locations((-0.339432587, -83.102272977)):
            Circle(SKETCH31_R)
        with Locations((55.024839536, -112.496366549)):
            Circle(SKETCH31_R)
        with Locations((114.730358799, -115.097978025)):
            Circle(SKETCH31_R)
        with Locations((114.711277521, 24.32117151)):
            Circle(SKETCH31_R)
        with Locations((91.785358799, -143.102272977)):
            Circle(SKETCH31_R)
        with Locations((-115.409641201, -115.097272977)):
            Circle(SKETCH31_R)
    extrude(amount=-CUT_EXTRUDE16_DEPTH, mode=Mode.SUBTRACT)

    # Sketch32 → Cut-Extrude17 (cut)
    with BuildSketch(Plane.XY.offset(5)):
        with BuildLine():
            Line((-117.889165528, 45.25117151), (-79.540559924, 45.25117151))
            Line((-79.540559924, 45.25117151), (117.209883125, 45.25117151))
            Line((117.209883125, 45.25117151), (117.199529886, 57.462780614))
            ThreePointArc((117.199529886, 57.462780614), (115.857667192, 62.457973139), (112.19953348, 66.114556461))
            Line((112.19953348, 66.114556461), (82.551631294, 83.23178077))
            ThreePointArc((82.551631294, 83.23178077), (80.139821745, 84.230784995), (77.551631294, 84.571526732))
            Line((77.551631294, 84.571526732), (-78.230913696, 84.571526732))
            ThreePointArc((-78.230913696, 84.571526732), (-80.819104147, 84.230784995), (-83.230913696, 83.23178077))
            Line((-83.230913696, 83.23178077), (-112.878815883, 66.114556461))
            ThreePointArc((-112.878815883, 66.114556461), (-116.536949595, 62.457973139), (-117.878812289, 57.462780614))
            Line((-117.878812289, 57.462780614), (-117.889165528, 45.25117151))
        make_face()
    extrude(amount=-CUT_EXTRUDE17_DEPTH, mode=Mode.SUBTRACT)

    # Sketch33 → Boss-Extrude23 (add)
    with BuildSketch(Plane.XY.offset(5)):
        with Locations((114.808231898, -68.665098892)):
            Circle(SKETCH33_R)
        with Locations((-115.487097072, -68.665098892)):
            Circle(SKETCH33_R)
    extrude(amount=-BOSS_EXTRUDE23_DEPTH)

    # Sketch34 → Cut-Extrude18 (cut)
    with BuildSketch(Plane.XY.offset(5)):
        with Locations((-115.487097072, -68.665098892)):
            Circle(SKETCH34_R)
        with Locations((114.808231898, -68.665098892)):
            Circle(SKETCH34_R)
    extrude(amount=-CUT_EXTRUDE18_DEPTH, mode=Mode.SUBTRACT)

    # Sketch35 → Cut-Extrude19 (cut)
    with BuildSketch(Plane.XY.offset(5)):
        with Locations((-0.325135338, -54.922272977)):
            Circle(SKETCH35_R)
        with Locations((-52.880135338, -54.922272977)):
            Rectangle(SKETCH35_W, SKETCH35_H)
        with Locations((52.229864662, -54.922272977)):
            Rectangle(SKETCH35_W, SKETCH35_H)
    extrude(amount=-CUT_EXTRUDE19_DEPTH, mode=Mode.SUBTRACT)

    # Sketch36 → Boss-Extrude24 (add)
    with BuildSketch(Plane(origin=(117.248277127, 0.099405362, 0), x_dir=(0, 0, -1), z_dir=(0.999999640601339, 0.0008478190804503918, 0))):
        with Locations((-2.5, -22.245362775)):
            Rectangle(SKETCH36_W, SKETCH36_H)
    extrude(amount=-BOSS_EXTRUDE24_DEPTH)

    # Sketch38 → Cut-Extrude20 (cut)
    with BuildSketch(Plane.XY.offset(5)):
        with Locations((19.67048227, 2.30323698)):
            Circle(SKETCH38_R)
        with Locations((-20.329514673, 2.287600163)):
            Circle(SKETCH38_R)
        with Locations((27.697846088, -67.693630309)):
            Circle(SKETCH38_R)
        with Locations((-28.302149633, -67.715521852)):
            Circle(SKETCH38_R)
    extrude(amount=-CUT_EXTRUDE20_DEPTH, mode=Mode.SUBTRACT)

    # Sketch39 → Cut-Extrude22 (cut)
    with BuildSketch(Plane.XY.offset(5)):
        with BuildLine():
            Line((117.251028602, -3.145949418), (87.251028602, -3.145949418))
            ThreePointArc((87.251028602, -3.145949418), (78.049715414, -22.145949418), (87.251028602, -41.145949418))
            Line((87.251028602, -41.145949418), (117.251028602, -41.145949418))
            Line((117.251028602, -41.145949418), (120.145365357, -41.145949418))
            Line((120.145365357, -41.145949418), (120.145365357, -3.145949418))
            Line((120.145365357, -3.145949418), (117.251028602, -3.145949418))
        make_face()
    extrude(amount=-CUT_EXTRUDE22_DEPTH, mode=Mode.SUBTRACT)

    # Sketch41 → Cut-Extrude23 (cut)
    with BuildSketch(Plane.XY.offset(5)):
        with Locations((-0.34176075, 42.75117151)):
            Rectangle(SKETCH41_W, SKETCH41_H)
    extrude(amount=-CUT_EXTRUDE23_DEPTH, mode=Mode.SUBTRACT)

    # Sketch42 → Cut-Extrude24 (cut)
    with BuildSketch(Plane.XY.offset(5)):
        with Locations((120.751971747, 45.773684751)):
            Rectangle(SKETCH42_W, SKETCH42_H)
    extrude(amount=-CUT_EXTRUDE24_DEPTH, mode=Mode.SUBTRACT)

    # Sketch43 → Boss-Extrude25 (add)
    with BuildSketch(Plane.XY.offset(5)):
        with BuildLine():
            Line((84.985802274, 40.244067356), (93.646056311, 40.244067356))
            ThreePointArc((93.646056311, 40.244067356), (89.315929292, 42.744067356), (84.985802274, 40.244067356))
        make_face()
        with BuildLine():
            Line((-94.325326668, 40.244067356), (-85.66507263, 40.244067356))
            ThreePointArc((-85.66507263, 40.244067356), (-89.995199649, 42.744067356), (-94.325326668, 40.244067356))
        make_face()
    extrude(amount=-BOSS_EXTRUDE25_DEPTH)

    # Sketch44 → Cut-Extrude25 (cut)
    with BuildSketch(Plane.XY.offset(5)):
        with Locations((-89.995199649, 37.744067356)):
            Circle(SKETCH44_R)
        with Locations((89.315929292, 37.744067356)):
            Circle(SKETCH44_R)
    extrude(amount=-CUT_EXTRUDE25_DEPTH, mode=Mode.SUBTRACT)


solid = boss_extrude13_piece_1_3.part
